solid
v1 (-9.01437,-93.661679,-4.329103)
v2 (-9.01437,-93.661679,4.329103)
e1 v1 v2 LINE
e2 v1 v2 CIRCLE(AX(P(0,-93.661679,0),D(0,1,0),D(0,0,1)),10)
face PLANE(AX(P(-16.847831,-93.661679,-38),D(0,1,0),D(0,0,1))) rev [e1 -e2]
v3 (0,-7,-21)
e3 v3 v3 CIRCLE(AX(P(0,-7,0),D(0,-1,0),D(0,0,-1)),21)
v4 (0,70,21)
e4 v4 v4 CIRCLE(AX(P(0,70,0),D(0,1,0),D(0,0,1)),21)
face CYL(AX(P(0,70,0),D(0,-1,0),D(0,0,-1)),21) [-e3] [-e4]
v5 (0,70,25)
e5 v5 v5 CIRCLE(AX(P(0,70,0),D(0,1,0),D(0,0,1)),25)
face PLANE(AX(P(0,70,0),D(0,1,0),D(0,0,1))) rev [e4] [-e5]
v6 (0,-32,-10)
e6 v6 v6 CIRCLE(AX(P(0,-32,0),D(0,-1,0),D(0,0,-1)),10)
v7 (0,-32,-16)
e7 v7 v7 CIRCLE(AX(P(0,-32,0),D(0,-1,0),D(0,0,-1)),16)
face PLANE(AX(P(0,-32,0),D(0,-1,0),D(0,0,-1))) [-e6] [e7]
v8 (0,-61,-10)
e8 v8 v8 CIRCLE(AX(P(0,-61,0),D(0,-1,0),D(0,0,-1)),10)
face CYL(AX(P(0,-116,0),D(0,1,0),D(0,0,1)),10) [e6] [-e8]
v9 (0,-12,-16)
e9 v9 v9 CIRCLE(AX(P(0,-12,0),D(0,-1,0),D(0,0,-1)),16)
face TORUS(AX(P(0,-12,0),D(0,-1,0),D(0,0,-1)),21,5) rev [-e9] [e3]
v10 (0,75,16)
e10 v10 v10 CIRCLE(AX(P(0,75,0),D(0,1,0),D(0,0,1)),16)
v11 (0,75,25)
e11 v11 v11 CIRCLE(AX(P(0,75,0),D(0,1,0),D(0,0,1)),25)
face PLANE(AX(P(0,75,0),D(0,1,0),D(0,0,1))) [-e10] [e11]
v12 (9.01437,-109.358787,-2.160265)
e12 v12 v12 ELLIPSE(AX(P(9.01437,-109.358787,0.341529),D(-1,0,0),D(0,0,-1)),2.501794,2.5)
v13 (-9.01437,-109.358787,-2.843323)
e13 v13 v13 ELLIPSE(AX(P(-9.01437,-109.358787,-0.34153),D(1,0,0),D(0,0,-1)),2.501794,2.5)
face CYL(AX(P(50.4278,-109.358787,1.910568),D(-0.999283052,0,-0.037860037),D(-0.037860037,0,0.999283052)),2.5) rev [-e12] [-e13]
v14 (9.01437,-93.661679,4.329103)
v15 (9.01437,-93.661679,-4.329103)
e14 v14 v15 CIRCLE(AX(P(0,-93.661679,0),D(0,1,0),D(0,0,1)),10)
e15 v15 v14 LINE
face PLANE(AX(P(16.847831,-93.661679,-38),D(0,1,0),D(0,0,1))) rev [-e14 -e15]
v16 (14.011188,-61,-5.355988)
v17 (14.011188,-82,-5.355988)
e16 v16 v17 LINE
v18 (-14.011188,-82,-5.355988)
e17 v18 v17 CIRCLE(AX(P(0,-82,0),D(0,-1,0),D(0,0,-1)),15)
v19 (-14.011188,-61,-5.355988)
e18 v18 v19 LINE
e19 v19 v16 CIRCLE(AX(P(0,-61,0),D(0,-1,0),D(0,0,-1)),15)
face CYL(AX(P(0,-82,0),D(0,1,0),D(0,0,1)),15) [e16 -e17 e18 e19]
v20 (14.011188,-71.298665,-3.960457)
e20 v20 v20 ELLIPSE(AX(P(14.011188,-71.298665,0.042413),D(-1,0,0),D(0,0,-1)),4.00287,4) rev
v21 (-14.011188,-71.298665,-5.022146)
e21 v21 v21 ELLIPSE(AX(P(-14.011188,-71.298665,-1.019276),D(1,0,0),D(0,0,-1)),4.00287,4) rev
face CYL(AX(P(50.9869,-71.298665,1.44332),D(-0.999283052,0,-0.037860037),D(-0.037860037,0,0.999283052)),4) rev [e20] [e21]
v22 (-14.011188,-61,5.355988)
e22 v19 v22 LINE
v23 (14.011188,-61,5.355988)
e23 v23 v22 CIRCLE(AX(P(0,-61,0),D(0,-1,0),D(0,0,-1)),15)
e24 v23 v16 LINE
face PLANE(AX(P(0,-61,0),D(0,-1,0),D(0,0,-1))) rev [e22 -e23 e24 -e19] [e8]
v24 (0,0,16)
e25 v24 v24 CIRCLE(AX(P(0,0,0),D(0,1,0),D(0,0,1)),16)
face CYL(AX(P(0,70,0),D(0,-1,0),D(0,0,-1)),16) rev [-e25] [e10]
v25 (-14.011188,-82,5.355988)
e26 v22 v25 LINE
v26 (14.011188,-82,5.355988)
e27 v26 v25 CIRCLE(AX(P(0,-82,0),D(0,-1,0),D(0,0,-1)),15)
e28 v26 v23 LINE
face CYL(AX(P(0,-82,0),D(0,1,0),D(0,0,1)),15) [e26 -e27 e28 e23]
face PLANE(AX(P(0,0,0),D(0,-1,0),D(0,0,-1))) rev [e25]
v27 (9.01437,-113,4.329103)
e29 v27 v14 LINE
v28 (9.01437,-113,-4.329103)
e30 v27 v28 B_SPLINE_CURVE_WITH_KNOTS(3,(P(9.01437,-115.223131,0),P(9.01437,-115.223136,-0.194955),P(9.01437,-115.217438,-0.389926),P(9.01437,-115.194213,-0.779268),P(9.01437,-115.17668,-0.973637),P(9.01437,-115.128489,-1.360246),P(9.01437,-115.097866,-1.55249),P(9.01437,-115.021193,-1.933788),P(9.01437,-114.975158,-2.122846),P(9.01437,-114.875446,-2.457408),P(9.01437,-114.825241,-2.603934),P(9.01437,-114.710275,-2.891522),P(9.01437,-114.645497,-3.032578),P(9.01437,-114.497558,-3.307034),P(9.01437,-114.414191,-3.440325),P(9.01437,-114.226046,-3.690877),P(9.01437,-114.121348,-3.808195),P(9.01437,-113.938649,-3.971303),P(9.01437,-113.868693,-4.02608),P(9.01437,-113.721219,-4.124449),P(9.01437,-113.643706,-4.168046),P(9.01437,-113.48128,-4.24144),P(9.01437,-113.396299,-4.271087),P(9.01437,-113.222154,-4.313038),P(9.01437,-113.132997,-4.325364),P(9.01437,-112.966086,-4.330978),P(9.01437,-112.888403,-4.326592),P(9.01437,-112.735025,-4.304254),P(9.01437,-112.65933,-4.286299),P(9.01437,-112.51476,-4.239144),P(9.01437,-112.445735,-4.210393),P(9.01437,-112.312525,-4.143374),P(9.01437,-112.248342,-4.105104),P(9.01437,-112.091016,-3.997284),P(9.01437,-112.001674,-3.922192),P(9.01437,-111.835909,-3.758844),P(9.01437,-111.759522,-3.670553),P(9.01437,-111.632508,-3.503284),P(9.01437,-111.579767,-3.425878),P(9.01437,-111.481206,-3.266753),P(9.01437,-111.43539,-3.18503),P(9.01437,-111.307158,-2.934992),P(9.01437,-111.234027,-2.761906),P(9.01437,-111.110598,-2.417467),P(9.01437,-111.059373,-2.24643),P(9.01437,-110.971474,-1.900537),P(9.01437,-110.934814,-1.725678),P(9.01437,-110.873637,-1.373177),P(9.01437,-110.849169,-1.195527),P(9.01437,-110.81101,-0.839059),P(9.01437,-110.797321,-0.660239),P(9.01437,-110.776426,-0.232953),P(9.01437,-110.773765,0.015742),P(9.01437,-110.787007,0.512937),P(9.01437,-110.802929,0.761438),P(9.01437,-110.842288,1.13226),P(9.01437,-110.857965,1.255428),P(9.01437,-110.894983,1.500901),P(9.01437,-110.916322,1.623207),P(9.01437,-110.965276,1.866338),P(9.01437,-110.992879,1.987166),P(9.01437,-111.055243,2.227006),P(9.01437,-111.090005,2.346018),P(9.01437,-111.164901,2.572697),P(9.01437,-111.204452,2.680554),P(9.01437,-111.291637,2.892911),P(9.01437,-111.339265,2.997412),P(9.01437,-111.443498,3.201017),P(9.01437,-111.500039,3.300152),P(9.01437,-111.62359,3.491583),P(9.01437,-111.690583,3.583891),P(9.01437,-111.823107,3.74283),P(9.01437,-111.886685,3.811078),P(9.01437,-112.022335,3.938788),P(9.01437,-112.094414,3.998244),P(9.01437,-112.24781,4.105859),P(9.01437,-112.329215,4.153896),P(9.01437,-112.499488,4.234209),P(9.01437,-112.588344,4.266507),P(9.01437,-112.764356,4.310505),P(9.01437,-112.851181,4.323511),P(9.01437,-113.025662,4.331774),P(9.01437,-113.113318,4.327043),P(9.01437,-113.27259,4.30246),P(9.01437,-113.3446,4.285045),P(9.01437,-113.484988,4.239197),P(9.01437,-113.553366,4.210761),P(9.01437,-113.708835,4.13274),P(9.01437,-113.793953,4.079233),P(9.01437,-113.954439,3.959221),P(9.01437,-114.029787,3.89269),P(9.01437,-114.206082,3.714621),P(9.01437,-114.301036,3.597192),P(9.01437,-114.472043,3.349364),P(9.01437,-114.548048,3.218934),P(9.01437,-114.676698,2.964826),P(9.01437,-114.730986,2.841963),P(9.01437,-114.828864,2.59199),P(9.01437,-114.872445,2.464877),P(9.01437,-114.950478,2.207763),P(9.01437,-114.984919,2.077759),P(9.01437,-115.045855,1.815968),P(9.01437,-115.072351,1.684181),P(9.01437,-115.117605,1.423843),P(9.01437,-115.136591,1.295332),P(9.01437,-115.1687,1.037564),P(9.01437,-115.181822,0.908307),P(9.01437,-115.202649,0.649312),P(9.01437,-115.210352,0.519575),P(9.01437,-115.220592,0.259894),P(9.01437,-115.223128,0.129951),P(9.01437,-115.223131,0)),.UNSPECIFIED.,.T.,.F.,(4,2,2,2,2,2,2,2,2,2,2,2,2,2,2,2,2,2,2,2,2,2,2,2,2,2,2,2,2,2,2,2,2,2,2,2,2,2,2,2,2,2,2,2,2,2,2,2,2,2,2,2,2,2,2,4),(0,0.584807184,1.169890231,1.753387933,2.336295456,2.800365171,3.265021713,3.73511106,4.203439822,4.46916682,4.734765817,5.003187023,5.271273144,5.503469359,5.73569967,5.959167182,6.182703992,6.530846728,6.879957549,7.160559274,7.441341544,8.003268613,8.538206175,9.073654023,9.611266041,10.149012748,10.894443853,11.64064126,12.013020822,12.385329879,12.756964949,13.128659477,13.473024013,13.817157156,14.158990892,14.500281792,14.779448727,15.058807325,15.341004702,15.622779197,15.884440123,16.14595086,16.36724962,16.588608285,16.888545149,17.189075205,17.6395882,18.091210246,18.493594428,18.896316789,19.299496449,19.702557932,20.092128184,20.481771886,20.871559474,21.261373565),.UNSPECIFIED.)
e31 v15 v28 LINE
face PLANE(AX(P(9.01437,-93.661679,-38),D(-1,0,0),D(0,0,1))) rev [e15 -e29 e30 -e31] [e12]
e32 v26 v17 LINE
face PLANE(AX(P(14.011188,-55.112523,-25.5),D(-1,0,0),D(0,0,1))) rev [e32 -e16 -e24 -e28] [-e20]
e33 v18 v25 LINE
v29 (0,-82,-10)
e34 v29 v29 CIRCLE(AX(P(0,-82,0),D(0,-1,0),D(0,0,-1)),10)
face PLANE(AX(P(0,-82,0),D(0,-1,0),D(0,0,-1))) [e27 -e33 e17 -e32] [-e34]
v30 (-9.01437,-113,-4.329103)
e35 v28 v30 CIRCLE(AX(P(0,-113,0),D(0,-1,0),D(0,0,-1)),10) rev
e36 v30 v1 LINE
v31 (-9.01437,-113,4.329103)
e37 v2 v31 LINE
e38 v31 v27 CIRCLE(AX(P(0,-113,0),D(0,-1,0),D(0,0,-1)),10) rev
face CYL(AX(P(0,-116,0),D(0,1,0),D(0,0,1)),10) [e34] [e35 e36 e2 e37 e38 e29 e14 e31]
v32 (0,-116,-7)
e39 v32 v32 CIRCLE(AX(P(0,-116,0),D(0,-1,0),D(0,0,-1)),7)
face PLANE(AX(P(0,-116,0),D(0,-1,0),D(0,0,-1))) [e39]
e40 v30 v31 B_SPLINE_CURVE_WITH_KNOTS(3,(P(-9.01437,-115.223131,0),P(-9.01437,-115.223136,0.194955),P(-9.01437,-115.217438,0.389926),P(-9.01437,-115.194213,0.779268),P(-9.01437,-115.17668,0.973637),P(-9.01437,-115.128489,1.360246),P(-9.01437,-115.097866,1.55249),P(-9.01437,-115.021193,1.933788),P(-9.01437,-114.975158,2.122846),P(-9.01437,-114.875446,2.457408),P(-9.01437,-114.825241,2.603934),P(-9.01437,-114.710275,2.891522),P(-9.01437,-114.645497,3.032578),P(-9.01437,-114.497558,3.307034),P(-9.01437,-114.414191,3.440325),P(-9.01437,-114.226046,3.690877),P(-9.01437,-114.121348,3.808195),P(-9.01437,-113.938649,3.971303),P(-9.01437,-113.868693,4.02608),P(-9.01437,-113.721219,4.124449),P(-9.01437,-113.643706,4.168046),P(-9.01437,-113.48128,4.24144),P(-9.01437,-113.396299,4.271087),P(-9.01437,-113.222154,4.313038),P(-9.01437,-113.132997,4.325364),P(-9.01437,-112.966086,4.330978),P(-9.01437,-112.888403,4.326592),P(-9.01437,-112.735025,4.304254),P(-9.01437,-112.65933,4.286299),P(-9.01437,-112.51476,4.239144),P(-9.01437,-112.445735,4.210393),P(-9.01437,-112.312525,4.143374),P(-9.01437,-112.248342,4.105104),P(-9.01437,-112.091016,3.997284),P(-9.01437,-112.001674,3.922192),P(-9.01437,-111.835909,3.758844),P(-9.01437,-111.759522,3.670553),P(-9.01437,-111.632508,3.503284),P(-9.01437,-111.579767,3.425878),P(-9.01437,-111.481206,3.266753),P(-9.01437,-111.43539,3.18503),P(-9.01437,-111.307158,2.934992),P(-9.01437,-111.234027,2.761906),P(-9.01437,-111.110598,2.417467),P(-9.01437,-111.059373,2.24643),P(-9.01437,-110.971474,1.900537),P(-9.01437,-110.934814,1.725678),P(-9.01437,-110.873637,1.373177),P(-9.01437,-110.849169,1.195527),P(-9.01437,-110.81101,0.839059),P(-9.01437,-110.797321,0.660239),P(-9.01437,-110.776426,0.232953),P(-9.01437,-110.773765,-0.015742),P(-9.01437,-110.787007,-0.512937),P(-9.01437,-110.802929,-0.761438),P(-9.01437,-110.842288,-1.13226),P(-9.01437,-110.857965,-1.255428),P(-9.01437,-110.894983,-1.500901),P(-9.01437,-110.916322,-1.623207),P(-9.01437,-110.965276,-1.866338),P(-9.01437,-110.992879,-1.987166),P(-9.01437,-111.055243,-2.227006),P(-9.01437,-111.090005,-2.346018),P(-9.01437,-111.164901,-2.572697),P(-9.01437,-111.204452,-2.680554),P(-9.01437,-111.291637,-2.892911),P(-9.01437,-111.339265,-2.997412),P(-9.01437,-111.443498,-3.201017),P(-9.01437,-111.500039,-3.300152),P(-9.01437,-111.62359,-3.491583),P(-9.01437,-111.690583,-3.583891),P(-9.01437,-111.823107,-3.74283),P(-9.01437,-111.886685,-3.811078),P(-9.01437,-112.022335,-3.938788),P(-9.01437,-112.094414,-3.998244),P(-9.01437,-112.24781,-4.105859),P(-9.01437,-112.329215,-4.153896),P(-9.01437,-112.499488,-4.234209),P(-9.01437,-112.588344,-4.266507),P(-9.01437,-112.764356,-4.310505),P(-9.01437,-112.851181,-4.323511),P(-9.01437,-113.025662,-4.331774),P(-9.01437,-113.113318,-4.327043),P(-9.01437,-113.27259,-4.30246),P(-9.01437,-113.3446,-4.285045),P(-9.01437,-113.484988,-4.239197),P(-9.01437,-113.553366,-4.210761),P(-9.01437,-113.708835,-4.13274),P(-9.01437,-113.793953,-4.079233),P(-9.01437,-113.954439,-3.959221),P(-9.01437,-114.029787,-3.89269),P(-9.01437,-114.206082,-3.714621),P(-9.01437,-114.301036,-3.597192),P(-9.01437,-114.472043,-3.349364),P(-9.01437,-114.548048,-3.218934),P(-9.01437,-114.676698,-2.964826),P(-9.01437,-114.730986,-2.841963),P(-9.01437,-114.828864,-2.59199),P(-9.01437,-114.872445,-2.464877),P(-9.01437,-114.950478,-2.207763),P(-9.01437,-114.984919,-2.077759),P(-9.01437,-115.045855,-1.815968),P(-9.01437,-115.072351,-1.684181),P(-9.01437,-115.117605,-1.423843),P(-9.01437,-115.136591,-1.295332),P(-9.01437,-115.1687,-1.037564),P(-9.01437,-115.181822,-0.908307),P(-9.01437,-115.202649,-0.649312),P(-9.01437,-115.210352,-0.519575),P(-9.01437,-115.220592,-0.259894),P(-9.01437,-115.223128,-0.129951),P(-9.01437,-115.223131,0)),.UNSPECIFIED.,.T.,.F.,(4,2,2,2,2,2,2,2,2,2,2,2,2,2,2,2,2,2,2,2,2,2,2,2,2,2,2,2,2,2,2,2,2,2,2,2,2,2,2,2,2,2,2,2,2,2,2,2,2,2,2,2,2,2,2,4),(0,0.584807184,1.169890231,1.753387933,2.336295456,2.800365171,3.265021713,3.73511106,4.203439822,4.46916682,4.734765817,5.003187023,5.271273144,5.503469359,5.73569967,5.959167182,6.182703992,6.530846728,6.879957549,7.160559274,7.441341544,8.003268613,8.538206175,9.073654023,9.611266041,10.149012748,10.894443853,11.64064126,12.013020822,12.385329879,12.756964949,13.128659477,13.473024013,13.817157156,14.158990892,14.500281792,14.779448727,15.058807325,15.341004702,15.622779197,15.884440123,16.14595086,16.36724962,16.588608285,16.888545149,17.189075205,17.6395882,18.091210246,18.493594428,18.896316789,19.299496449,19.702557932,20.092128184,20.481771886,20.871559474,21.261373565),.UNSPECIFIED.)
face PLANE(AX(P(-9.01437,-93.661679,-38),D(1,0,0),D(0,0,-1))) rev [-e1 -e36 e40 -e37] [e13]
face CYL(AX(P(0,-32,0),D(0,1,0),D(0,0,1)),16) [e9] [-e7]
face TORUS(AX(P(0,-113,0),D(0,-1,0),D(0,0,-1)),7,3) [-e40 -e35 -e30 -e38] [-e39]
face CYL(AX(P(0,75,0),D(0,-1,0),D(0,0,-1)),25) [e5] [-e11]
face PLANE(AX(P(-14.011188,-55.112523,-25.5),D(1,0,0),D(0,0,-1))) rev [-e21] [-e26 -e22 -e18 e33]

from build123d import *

# Parameters (mm, degrees)
SKETCH_1_R          = 21
SKETCH_1_R_2        = 16
EXTRUDE_1_DEPTH     = 70
EXTRUDE_START       = 7
SKETCH_3_R          = 21
EXTRUDE_2_DEPTH     = 7
SKETCH_4_R          = 10
EXTRUDE_3_DEPTH     = 109
FILLET_4_R          = 3
SKETCH_5_W          = 7.833460296
SKETCH_5_H          = 29.006841396
CUT_EXTRUDE_1_DEPTH = 38
SKETCH_9_R          = 2.5
CUT_EXTRUDE_3_DEPTH = 77.5
EXTRUDE_START_2     = 25
SKETCH_10_R         = 16
EXTRUDE_4_DEPTH     = 25
FILLET_5_R          = 5
SKETCH_11_R         = 25
SKETCH_11_R_2       = 16
EXTRUDE_5_DEPTH     = 5
SKETCH_14_R         = 15
EXTRUDE_6_DEPTH     = 21
SKETCH_7_R          = 4.000000002
CUT_EXTRUDE_2_DEPTH = 77.5
SKETCH_15_W         = 9.449953832
SKETCH_15_H         = 32.068314676
CUT_EXTRUDE_4_DEPTH = 25.5


with BuildPart() as part:
    # Эскиз1 → Вытянуть1 (new body)
    with BuildSketch(Plane(origin=(0, 0, 0), x_dir=(1, 0, 0), z_dir=(0, 1, 0))):
        with Locations(Location((0, 0, 0), (0, 0, 270))):
            Circle(SKETCH_1_R)
        with Locations(Location((0, 0, 0), (0, 0, 270))):
            Circle(SKETCH_1_R_2, mode=Mode.SUBTRACT)
    extrude(amount=EXTRUDE_1_DEPTH)

    # Эскиз3 → Вытянуть2 (add)
    with BuildSketch(Plane.XZ.offset(EXTRUDE_START)):
        with Locations(Location((0, 0, 0), (0, 0, 270))):
            Circle(SKETCH_3_R)
    extrude(amount=-EXTRUDE_2_DEPTH)

    # Эскиз4 → Вытянуть3 (add)
    with BuildSketch(Plane.XZ.offset(7)):
        with Locations(Location((0, 0, 0), (0, 0, 270))):
            Circle(SKETCH_4_R)
    extrude(amount=EXTRUDE_3_DEPTH)

    # Скругление4
    fillet_4_edges = [part.edges().sort_by_distance(p)[0] for p in [
        (0, -116, 10),
    ]]
    fillet(fillet_4_edges, radius=FILLET_4_R)

    # Эскиз5 → Вырез-Вытянуть1 (cut, symmetric)
    with BuildSketch(Plane.XY):
        with Locations((-12.931100354, -108.165099948)):
            Rectangle(SKETCH_5_W, SKETCH_5_H)
        with Locations((12.931100354, -108.165099948)):
            Rectangle(SKETCH_5_W, SKETCH_5_H)
    extrude(amount=CUT_EXTRUDE_1_DEPTH, both=True, mode=Mode.SUBTRACT)

    # Эскиз9 → Вырез-Вытянуть3 (cut, symmetric)
    with BuildSketch(Plane(origin=(-27.016636389, 0, -1.023584716), x_dir=(-0.03786003720910068, 0, 0.9992830517838905), z_dir=(-0.9992830517838904, 0, -0.03786003720910067))):
        with Locations(Location((-3.61e-07, -109.358787083, 0), (0, 0, 180))):
            Circle(SKETCH_9_R)
    extrude(amount=CUT_EXTRUDE_3_DEPTH, both=True, mode=Mode.SUBTRACT)

    # Эскиз10 → Вытянуть4 (add)
    with BuildSketch(Plane.XZ.offset(7).offset(EXTRUDE_START_2)):
        with Locations(Location((0, 0, 0), (0, 0, 90))):
            Circle(SKETCH_10_R)
    extrude(amount=-EXTRUDE_4_DEPTH)

    # Скругление5
    fillet_5_edges = [part.edges().sort_by_distance(p)[0] for p in [
        (0, -7, -16),
    ]]
    fillet(fillet_5_edges, radius=FILLET_5_R - 0.0001)  # a hair under: the kernel refuses the full size

    # Эскиз11 → Вытянуть5 (add)
    with BuildSketch(Plane(origin=(0, 70, 0), x_dir=(1, 0, 0), z_dir=(0, 1, 0))):
        with Locations(Location((0, 0, 0), (0, 0, 270))):
            Circle(SKETCH_11_R)
        with Locations(Location((0, 0, 0), (0, 0, 90))):
            Circle(SKETCH_11_R_2, mode=Mode.SUBTRACT)
    extrude(amount=EXTRUDE_5_DEPTH)

    # Эскиз14 → Вытянуть6 (add)
    with BuildSketch(Plane.XZ.offset(61)):
        with Locations(Location((0, 0, 0), (0, 0, 90))):
            Circle(SKETCH_14_R)
    extrude(amount=EXTRUDE_6_DEPTH)

    # Эскиз7 → Вырез-Вытянуть2 (cut, symmetric)
    with BuildSketch(Plane(origin=(-26.476014958, 0, -1.003102084), x_dir=(-0.037860037209100694, 0, 0.9992830517838905), z_dir=(-0.9992830517838904, 0, -0.03786003720910069))):
        with Locations((-0.488081216, -71.29866531)):
            Circle(SKETCH_7_R)
    extrude(amount=CUT_EXTRUDE_2_DEPTH, both=True, mode=Mode.SUBTRACT)

    # Эскиз15 → Вырез-Вытянуть4 (cut, symmetric)
    with BuildSketch(Plane.XY):
        with Locations((-18.736164954, -71.146680529)):
            Rectangle(SKETCH_15_W, SKETCH_15_H)
        with Locations((18.736164954, -71.146680529)):
            Rectangle(SKETCH_15_W, SKETCH_15_H)
    extrude(amount=CUT_EXTRUDE_4_DEPTH, both=True, mode=Mode.SUBTRACT)


solid = part.part
